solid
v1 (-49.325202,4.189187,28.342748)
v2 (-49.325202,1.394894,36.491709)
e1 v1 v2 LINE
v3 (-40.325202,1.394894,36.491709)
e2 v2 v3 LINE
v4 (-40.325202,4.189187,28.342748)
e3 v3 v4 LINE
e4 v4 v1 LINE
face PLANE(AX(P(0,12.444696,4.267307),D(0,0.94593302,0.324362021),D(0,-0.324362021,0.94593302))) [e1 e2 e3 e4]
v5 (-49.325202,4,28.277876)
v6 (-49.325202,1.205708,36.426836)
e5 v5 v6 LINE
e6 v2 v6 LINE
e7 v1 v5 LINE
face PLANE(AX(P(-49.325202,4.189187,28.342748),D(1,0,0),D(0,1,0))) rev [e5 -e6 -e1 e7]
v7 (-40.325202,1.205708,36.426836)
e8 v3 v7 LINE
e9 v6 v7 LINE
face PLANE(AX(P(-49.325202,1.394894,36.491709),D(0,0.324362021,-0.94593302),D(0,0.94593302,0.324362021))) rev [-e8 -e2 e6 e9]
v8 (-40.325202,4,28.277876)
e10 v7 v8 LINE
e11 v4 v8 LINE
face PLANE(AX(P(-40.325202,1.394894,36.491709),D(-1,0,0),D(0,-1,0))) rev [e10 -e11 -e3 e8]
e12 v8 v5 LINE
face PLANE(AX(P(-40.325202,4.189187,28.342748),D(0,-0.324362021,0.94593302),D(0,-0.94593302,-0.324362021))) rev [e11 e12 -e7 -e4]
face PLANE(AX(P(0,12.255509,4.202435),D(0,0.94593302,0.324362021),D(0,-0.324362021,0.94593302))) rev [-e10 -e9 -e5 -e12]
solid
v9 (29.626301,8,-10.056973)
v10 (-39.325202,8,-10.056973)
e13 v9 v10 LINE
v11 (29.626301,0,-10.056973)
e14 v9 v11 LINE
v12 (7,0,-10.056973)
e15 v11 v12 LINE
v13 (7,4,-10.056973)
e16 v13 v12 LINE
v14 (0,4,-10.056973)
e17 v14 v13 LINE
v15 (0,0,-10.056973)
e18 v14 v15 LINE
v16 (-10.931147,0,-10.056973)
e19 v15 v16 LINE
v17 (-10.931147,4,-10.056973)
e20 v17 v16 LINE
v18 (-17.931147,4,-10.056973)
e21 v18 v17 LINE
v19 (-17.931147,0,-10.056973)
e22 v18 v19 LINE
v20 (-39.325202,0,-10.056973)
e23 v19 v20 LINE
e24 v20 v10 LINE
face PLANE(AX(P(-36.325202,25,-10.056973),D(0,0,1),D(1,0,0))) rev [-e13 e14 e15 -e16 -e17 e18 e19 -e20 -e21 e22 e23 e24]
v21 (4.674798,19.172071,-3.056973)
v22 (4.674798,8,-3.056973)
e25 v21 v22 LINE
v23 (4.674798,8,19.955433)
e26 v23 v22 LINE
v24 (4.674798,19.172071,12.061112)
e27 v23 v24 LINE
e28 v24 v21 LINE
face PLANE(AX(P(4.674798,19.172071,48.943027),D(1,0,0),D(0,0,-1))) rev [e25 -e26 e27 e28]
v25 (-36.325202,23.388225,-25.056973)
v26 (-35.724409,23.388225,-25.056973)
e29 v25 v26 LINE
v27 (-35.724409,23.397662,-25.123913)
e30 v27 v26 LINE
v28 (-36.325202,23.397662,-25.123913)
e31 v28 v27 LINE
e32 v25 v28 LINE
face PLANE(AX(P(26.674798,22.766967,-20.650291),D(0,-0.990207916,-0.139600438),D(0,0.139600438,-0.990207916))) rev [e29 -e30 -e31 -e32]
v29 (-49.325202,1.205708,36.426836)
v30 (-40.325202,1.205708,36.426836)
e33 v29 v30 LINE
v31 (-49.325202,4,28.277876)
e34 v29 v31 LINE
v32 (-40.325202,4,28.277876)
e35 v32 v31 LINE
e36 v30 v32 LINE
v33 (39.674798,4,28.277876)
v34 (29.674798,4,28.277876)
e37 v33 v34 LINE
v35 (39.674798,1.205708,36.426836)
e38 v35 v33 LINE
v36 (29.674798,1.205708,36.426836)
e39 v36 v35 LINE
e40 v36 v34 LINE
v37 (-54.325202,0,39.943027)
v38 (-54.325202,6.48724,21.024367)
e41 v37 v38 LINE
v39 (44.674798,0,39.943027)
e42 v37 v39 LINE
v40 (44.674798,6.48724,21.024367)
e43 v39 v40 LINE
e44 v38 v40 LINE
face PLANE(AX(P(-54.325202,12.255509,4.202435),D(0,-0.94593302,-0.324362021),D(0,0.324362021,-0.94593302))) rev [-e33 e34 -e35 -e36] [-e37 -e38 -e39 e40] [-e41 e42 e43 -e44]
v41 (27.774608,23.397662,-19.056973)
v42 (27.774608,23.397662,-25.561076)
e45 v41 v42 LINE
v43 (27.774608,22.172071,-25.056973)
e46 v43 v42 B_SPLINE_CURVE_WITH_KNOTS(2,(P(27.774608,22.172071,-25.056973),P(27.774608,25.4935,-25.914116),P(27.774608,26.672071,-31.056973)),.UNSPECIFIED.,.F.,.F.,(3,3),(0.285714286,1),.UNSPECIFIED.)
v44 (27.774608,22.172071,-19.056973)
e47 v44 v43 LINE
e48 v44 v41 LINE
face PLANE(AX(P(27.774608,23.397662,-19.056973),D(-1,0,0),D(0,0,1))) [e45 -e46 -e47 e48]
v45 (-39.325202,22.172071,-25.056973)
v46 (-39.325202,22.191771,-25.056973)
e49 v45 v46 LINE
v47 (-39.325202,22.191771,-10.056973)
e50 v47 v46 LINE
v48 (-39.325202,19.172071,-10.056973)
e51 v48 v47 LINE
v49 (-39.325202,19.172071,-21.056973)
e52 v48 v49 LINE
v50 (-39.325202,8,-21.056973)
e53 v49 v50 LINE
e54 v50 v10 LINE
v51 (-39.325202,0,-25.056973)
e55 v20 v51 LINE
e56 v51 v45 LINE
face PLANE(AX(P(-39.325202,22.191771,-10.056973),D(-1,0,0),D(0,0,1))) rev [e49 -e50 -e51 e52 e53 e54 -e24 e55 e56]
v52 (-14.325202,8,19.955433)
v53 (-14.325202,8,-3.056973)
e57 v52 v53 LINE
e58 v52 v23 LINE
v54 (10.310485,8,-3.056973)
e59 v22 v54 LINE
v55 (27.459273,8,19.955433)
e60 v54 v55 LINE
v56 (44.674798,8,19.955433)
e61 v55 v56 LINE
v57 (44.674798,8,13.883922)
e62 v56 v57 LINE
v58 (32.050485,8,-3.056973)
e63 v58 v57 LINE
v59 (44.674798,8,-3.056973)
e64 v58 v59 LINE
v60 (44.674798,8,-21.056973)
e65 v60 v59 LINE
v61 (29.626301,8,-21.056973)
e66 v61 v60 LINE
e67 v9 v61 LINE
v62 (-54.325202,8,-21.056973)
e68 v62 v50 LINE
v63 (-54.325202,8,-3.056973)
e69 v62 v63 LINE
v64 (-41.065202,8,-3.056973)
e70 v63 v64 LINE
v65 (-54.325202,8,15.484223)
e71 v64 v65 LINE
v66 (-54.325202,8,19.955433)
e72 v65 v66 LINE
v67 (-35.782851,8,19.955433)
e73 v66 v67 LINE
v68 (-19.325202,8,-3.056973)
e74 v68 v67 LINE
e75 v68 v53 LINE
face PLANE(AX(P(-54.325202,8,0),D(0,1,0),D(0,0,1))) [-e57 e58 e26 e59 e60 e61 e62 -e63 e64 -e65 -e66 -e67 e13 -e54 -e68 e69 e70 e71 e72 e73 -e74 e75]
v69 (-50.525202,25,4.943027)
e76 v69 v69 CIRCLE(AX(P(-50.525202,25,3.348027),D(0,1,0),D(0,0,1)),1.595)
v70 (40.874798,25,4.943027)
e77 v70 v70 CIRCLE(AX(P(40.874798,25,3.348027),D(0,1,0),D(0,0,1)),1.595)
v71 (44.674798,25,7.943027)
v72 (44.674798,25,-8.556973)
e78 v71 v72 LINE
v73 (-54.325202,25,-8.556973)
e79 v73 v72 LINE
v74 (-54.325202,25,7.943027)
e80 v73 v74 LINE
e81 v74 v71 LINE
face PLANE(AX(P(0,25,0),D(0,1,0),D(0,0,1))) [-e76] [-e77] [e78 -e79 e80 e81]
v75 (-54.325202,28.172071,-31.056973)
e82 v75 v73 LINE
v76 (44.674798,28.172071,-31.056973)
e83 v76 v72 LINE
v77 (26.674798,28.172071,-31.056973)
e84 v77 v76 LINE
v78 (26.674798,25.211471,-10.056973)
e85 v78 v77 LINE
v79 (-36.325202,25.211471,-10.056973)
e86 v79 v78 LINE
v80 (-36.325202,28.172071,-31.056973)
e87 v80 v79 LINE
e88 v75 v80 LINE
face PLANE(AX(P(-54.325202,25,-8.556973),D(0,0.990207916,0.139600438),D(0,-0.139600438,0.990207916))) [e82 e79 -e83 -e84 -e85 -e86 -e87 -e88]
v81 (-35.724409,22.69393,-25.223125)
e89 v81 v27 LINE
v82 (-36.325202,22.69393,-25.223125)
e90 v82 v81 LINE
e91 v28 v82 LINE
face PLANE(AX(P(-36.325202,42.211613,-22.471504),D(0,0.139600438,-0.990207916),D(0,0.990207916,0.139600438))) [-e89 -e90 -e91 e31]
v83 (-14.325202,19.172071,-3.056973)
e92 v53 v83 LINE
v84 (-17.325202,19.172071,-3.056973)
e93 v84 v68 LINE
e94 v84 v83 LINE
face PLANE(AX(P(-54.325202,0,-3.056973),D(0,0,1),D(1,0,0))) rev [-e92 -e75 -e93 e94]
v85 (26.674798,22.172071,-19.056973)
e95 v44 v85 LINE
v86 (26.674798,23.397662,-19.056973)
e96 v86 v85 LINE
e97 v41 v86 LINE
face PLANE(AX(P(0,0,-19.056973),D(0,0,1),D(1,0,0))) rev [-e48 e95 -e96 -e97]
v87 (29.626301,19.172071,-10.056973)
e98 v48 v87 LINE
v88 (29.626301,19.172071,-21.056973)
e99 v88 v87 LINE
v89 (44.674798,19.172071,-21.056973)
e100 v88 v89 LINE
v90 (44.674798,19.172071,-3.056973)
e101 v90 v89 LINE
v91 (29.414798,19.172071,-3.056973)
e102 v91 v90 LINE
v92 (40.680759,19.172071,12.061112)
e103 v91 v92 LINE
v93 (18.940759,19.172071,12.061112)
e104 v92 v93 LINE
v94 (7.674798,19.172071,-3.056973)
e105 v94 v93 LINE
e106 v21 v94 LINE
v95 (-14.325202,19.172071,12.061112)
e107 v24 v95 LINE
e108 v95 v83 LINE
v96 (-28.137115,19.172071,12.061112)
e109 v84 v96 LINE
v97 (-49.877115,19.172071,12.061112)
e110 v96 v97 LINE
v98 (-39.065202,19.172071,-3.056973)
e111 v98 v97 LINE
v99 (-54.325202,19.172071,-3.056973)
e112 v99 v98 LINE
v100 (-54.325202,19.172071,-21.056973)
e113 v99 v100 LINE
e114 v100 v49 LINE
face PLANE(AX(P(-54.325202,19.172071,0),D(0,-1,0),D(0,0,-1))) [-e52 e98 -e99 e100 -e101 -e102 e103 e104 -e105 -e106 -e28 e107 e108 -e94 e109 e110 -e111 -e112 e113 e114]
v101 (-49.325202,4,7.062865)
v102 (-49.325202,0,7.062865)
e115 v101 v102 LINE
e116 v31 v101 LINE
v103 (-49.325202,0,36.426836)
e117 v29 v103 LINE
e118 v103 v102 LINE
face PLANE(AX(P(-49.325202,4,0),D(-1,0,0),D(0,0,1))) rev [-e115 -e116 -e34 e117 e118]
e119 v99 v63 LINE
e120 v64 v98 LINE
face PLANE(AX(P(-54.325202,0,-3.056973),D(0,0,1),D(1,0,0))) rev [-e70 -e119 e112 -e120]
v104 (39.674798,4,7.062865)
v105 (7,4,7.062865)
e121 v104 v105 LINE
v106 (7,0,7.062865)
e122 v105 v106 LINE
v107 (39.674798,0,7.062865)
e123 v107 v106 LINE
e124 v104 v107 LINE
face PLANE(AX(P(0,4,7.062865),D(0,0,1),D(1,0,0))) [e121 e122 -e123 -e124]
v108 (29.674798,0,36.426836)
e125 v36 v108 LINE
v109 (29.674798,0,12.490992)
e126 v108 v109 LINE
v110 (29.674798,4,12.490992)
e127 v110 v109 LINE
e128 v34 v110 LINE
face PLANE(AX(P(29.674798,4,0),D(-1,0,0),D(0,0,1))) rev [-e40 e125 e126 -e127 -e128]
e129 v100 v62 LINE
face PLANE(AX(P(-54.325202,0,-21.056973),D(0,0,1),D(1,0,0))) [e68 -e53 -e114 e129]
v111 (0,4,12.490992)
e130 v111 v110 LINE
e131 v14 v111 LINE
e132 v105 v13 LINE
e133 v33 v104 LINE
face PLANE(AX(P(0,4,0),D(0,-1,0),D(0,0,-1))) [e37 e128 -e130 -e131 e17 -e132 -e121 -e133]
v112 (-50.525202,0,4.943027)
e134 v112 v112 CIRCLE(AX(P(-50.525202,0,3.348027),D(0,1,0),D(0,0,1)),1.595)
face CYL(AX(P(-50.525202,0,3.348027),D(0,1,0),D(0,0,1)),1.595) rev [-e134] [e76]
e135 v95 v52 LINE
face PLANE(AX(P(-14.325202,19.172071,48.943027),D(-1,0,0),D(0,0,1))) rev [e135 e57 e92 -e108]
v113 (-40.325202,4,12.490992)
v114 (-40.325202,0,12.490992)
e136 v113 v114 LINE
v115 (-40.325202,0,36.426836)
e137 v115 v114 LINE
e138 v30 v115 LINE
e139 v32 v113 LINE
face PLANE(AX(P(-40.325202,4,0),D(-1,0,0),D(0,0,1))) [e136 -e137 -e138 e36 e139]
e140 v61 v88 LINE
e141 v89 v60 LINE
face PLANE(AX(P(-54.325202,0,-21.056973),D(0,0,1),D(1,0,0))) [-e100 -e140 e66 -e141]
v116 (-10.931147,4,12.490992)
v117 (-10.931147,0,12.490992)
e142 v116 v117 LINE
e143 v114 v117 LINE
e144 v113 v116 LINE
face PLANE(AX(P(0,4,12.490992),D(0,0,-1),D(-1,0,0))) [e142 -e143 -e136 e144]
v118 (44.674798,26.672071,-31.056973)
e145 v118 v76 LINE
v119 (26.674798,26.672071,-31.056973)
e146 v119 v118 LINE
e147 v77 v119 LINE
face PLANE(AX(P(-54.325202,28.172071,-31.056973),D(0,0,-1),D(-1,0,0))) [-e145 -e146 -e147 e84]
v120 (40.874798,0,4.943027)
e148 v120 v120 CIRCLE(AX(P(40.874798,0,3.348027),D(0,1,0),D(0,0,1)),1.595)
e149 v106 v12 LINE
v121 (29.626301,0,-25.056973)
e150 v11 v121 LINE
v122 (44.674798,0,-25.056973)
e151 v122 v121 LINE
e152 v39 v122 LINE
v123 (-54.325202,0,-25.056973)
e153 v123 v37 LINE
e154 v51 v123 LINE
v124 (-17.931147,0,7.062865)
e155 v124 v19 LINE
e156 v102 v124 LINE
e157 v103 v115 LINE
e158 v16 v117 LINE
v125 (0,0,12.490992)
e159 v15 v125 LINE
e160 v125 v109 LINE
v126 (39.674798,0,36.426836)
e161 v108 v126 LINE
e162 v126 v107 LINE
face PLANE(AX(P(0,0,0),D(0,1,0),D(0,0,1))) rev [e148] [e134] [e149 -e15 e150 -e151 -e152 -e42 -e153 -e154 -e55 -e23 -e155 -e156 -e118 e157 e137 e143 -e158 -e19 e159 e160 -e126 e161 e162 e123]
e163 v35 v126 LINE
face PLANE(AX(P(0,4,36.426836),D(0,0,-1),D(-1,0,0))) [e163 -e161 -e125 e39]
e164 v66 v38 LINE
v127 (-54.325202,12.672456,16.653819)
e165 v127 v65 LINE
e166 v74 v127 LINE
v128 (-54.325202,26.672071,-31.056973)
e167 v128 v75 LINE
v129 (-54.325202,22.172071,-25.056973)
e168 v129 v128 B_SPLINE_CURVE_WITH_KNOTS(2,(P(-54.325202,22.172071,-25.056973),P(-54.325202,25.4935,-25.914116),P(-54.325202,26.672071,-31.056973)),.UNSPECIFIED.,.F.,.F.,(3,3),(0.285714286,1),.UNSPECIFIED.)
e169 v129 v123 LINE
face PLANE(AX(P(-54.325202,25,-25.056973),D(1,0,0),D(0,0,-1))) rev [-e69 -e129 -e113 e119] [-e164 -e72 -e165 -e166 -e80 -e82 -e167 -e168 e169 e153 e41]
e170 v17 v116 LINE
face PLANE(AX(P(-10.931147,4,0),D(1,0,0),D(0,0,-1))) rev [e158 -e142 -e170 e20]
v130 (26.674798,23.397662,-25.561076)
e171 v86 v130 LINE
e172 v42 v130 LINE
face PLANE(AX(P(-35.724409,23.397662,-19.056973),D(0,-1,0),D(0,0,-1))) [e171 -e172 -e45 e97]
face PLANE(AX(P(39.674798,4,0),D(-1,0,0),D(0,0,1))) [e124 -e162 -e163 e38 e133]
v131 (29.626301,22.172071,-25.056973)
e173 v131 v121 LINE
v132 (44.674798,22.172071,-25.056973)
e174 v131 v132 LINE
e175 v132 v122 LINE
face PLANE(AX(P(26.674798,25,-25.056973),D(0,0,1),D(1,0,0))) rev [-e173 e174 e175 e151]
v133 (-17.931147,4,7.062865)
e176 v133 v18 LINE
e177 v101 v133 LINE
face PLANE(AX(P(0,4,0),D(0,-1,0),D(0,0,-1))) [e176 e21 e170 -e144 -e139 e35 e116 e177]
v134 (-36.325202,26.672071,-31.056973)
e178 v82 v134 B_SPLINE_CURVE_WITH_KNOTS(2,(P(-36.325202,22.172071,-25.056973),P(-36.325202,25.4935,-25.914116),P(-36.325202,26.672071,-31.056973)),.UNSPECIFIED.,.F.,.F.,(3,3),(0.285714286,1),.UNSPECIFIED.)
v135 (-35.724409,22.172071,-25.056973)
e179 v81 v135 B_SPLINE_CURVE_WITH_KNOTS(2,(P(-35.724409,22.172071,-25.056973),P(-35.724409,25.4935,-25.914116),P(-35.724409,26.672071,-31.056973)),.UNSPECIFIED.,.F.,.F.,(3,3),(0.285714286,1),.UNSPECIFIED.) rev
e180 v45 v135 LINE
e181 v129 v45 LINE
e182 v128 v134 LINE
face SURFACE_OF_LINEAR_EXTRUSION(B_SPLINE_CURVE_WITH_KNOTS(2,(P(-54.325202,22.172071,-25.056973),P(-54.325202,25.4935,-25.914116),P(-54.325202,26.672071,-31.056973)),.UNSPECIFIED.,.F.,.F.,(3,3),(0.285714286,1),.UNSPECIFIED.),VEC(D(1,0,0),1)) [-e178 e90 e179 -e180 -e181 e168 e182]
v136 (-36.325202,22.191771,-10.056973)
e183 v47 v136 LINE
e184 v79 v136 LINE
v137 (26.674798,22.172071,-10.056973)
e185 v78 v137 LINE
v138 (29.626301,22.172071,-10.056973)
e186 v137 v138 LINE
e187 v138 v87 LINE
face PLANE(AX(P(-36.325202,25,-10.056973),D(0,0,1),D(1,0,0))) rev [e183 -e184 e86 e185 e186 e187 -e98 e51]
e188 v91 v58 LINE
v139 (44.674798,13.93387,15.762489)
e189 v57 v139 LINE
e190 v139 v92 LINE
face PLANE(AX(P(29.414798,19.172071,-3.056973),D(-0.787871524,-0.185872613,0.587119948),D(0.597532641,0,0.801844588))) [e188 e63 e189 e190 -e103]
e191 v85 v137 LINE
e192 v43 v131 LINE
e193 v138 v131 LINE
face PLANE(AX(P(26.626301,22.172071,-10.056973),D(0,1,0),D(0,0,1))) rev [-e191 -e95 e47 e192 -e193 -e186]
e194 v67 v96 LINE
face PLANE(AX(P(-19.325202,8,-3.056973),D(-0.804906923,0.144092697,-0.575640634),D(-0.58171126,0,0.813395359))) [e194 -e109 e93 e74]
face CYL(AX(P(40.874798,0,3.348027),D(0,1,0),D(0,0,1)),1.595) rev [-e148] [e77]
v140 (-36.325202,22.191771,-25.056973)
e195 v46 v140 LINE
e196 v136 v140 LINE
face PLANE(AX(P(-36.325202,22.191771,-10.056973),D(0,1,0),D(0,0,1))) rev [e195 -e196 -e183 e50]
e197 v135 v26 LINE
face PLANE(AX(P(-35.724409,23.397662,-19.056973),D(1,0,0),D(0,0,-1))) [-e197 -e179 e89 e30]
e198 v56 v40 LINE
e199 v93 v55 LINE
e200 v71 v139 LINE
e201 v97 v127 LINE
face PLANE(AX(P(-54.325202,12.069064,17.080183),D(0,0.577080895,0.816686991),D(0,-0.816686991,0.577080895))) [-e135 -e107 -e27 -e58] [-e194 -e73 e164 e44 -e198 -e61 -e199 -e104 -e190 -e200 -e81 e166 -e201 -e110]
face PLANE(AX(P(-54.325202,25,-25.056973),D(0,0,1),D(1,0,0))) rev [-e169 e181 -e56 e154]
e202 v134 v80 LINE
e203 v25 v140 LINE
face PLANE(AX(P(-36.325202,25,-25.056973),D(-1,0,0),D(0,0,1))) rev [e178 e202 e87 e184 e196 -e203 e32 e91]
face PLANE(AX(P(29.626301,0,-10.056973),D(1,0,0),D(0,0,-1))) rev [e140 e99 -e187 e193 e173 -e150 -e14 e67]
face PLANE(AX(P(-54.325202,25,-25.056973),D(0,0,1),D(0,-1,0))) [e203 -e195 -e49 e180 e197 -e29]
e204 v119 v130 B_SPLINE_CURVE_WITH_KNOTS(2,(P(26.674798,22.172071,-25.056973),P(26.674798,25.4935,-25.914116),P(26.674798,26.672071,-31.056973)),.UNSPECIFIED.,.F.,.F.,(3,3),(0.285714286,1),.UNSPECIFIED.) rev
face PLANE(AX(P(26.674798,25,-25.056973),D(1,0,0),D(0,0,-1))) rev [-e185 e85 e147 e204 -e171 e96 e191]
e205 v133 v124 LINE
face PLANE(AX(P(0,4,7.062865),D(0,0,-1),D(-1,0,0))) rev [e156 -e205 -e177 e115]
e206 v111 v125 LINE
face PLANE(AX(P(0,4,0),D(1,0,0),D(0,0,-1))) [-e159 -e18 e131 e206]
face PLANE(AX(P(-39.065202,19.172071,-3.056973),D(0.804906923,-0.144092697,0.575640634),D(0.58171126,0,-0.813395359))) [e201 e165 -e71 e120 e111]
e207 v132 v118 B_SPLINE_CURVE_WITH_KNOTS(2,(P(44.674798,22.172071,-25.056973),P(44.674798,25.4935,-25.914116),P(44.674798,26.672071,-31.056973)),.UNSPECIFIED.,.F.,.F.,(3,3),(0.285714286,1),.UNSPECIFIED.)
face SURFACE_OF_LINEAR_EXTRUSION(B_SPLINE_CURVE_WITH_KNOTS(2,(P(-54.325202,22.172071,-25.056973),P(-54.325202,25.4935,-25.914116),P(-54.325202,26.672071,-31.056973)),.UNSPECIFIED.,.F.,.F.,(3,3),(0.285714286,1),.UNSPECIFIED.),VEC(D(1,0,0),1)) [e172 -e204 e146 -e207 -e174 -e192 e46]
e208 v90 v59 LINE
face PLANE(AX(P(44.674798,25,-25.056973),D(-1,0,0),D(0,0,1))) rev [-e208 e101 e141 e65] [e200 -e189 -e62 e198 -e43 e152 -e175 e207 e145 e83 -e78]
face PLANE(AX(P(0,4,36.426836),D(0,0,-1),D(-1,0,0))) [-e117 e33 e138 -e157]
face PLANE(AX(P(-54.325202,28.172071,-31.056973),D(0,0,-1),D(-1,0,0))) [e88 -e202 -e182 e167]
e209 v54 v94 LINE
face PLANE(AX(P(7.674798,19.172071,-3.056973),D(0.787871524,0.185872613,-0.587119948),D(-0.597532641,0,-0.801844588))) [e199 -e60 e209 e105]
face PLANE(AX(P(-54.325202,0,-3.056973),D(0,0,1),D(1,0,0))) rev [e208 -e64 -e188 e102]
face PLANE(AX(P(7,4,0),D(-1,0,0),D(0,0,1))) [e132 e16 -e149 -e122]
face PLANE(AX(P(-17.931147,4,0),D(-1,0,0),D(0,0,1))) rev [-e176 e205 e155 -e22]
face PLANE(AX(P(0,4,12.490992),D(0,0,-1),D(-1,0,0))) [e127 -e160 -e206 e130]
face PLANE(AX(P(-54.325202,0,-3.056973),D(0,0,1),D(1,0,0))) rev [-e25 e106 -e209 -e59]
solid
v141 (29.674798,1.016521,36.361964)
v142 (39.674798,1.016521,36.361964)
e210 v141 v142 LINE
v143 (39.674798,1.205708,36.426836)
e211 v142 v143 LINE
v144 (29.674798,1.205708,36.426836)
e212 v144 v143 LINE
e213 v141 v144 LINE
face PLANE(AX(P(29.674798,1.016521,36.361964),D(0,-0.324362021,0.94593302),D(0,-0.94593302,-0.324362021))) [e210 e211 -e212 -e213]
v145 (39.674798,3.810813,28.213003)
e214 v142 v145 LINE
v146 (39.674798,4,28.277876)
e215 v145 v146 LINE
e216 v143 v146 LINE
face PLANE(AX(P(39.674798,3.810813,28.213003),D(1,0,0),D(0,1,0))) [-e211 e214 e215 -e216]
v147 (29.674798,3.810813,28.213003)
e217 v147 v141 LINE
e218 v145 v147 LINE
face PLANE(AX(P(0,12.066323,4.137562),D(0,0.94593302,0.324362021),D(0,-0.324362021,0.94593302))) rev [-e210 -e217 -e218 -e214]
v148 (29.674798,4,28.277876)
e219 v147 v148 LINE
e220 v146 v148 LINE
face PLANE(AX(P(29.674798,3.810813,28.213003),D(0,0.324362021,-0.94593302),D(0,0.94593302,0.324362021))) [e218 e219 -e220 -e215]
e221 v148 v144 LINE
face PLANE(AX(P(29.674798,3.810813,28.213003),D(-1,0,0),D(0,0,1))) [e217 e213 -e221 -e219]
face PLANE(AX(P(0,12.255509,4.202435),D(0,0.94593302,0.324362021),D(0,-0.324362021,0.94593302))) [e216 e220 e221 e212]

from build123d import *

# Parameters (mm, degrees)
BOSS_EXTRUDE2_DEPTH      = 25
SKETCH4_W                = 18
SKETCH4_H                = 11.172071032
CUT_EXTRUDE1_DEPTH       = 110.64235231
BOSS_EXTRUDE3_DEPTH      = 99
SKETCH6_W                = 63
SKETCH6_H                = 15
CUT_EXTRUDE2_DEPTH       = 99
SKETCH7_R                = 1.595
CUT_EXTRUDE3_DEPTH       = 72.914344682
CUT_EXTRUDE6_DEPTH       = 52
CUT_SWEEP3_START         = -47.833237702
CUT_SWEEP3_DEPTH         = 41.493253901
CUT_SWEEP4_START         = 1.791784621
CUT_SWEEP4_DEPTH         = 40.904021271
SKETCH18_W               = 63
SKETCH18_H               = 6.0593335
CUT_EXTRUDE8_DEPTH       = 70.563104286
CUT_EXTRUDE11_DEPTH      = 39
CUT_EXTRUDE11_DEPTH_BACK = 5
SKETCH19_W               = 63
SKETCH19_H               = 3.899399546
CUT_EXTRUDE12_DEPTH      = 6
CUT_EXTRUDE12_DEPTH_BACK = 39
SKETCH21_W               = 63.499017214
SKETCH21_H               = 3.594283993
CUT_EXTRUDE13_DEPTH      = 19
CUT_EXTRUDE13_DEPTH_BACK = 39
SKETCH22_W               = 63
SKETCH22_H               = 0.482139274
SKETCH23_W               = 3
SKETCH23_H               = 22.172071032
CUT_EXTRUDE14_DEPTH      = 15
SKETCH24_W               = 3
SKETCH24_H               = 22.191771217
CUT_EXTRUDE15_DEPTH      = 15
CUT_EXTRUDE16_DEPTH      = 4
SKETCH27_W               = 10
SKETCH27_H               = 8.614733054
BOSS_EXTRUDE5_DEPTH      = 0.2
SKETCH28_W               = 9
SKETCH28_H               = 8.614733054
BOSS_EXTRUDE6_DEPTH      = 0.2


with BuildPart() as part:
    # Sketch1 → Boss-Extrude2 (new body)
    with BuildSketch(Plane(origin=(0, 0, 0), x_dir=(1, 0, 0), z_dir=(0, 1, 0))):
        Polygon((26.674798416, 25.056972824), (44.674798416, 25.056972824), (44.674798416, -39.943027176), (-54.325201584, -39.943027176), (-54.325201584, 25.056972824), (-36.325201584, 25.056972824), (-36.325201584, 10.056972824), (26.674798416, 10.056972824), align=None)
    extrude(amount=BOSS_EXTRUDE2_DEPTH)

    # Sketch4 → Cut-Extrude1 (cut, through all)
    with BuildSketch(Plane(origin=(44.674798416, 0, 0), x_dir=(0, 0, -1), z_dir=(1, 0, 0))):
        Polygon((-39.943027176, 25), (-39.943027176, 0), (-21.024366767, 6.487240423), (-7.943027176, 25), align=None)
        with Locations((12.056972824, 13.586035516)):
            Rectangle(SKETCH4_W, SKETCH4_H)
    extrude(amount=-CUT_EXTRUDE1_DEPTH, mode=Mode.SUBTRACT)

    # Sketch5 → Boss-Extrude3 (add)
    with BuildSketch(Plane(origin=(44.674798416, 0, 0), x_dir=(0, 0, -1), z_dir=(1, 0, 0))):
        with BuildLine():
            Line((8.556972824, 25), (31.056972824, 28.172071032))
            Line((31.056972824, 28.172071032), (31.056972824, 26.672071032))
            add(Edge.make_bspline(
                [(25.056972824, 22.172071032), (25.914115681, 25.493499604), (31.056972824, 26.672071032)],
                knots=[0.285714286, 0.285714286, 0.285714286, 1, 1, 1], degree=2))
            Line((25.056972824, 22.172071032), (25.056972824, 25))
            Line((25.056972824, 25), (8.556972824, 25))
        make_face()
    extrude(amount=-BOSS_EXTRUDE3_DEPTH)

    # Sketch6 → Cut-Extrude2 (cut)
    with BuildSketch(Plane.XZ.offset(-25)):
        with Locations((-4.825201584, -17.556972824)):
            Rectangle(SKETCH6_W, SKETCH6_H)
    extrude(amount=-CUT_EXTRUDE2_DEPTH, mode=Mode.SUBTRACT)

    # Sketch7 → Cut-Extrude3 (cut, through all)
    with BuildSketch(Plane(origin=(0, 25, 0), x_dir=(1, 0, 0), z_dir=(0, 1, 0))):
        with Locations(Location((40.874798416, -3.348027176, 0), (0, 0, 270))):
            Circle(SKETCH7_R)
        with Locations(Location((-50.525201584, -3.348027176, 0), (0, 0, 270))):
            Circle(SKETCH7_R)
    extrude(amount=-CUT_EXTRUDE3_DEPTH, mode=Mode.SUBTRACT)

    # Sketch9 → Cut-Extrude6 (cut)
    with BuildSketch(Plane(origin=(0, 0, -3.056972824), x_dir=(-1, 0, 0), z_dir=(0, 0, -1))):
        Polygon((4.825201584, 19.172071032), (14.325201584, 19.172071032), (14.325201584, 8), (4.825201584, 8), (-4.674798416, 8), (-4.674798416, 19.172071032), align=None)
    extrude(amount=-CUT_EXTRUDE6_DEPTH, mode=Mode.SUBTRACT)

    # Cut-Sweep3: read off the stored shape, not the designer's step
    # Cut-Sweep3 outline → Cut-Sweep3 (cut)
    with BuildSketch(Plane(origin=(0, 0, 0), x_dir=(0.8133953590059209, 0, 0.5817112599457132), z_dir=(0.5817112599457132, 0, -0.8133953590059209)).offset(CUT_SWEEP3_START)):
        Polygon((-17.497304793, -8), (-35.180519898, -8), (-33.55372918, -19.172071032), (-15.870514075, -19.172071032), align=None)
    extrude(amount=CUT_SWEEP3_DEPTH, mode=Mode.SUBTRACT)

    # Cut-Sweep4: read off the stored shape, not the designer's step
    # Cut-Sweep4 outline → Cut-Sweep4 (cut)
    with BuildSketch(Plane(origin=(0, 0, 0), x_dir=(0.8018445876826973, 0, -0.5975326411201026), z_dir=(0.5975326411201026, 0, 0.8018445876826972)).offset(CUT_SWEEP4_START)):
        Polygon((10.094047266, 8), (27.526148602, 8), (25.412737953, 19.172071032), (7.980636617, 19.172071032), align=None)
    extrude(amount=CUT_SWEEP4_DEPTH, mode=Mode.SUBTRACT)

    # Sketch18 → Cut-Extrude8 (cut, through all)
    with BuildSketch(Plane(origin=(0, 23.329932997, 3.289075762), x_dir=(1, 0, 0), z_dir=(0, 0.9902079164509707, 0.1396004376706153))):
        with Locations((-4.825201584, 31.656027047)):
            Rectangle(SKETCH18_W, SKETCH18_H)
    extrude(amount=-CUT_EXTRUDE8_DEPTH, mode=Mode.SUBTRACT)

    # Sketch19 → Cut-Extrude11 (cut, two sides: drawn at the far end of the back side and taken through both)
    with BuildSketch(Plane(origin=(0, 3.996252426, -28.346048585), x_dir=(-1, 0, 0), z_dir=(0, 0.13960043767061533, -0.9902079164509707)).offset(-CUT_EXTRUDE11_DEPTH_BACK)):
        with Locations((4.825201584, 21.610940987)):
            Rectangle(SKETCH19_W, SKETCH19_H)
    extrude(amount=CUT_EXTRUDE11_DEPTH + CUT_EXTRUDE11_DEPTH_BACK, mode=Mode.SUBTRACT)

    # Sketch21 → Cut-Extrude12 (cut, two sides: drawn at the far end of the back side and taken through both)
    with BuildSketch(Plane.XY.offset(-25.056972824).offset(-CUT_EXTRUDE12_DEPTH_BACK)):
        with Locations((-3.974900461, 21.600520274)):
            Rectangle(SKETCH21_W, SKETCH21_H)
    extrude(amount=CUT_EXTRUDE12_DEPTH + CUT_EXTRUDE12_DEPTH_BACK, mode=Mode.SUBTRACT)

    # Sketch22 → Cut-Extrude13 (cut, two sides: drawn at the far end of the back side and taken through both)
    with BuildSketch(Plane(origin=(0, 19.468716697, 2.744717879), x_dir=(1, 0, 0), z_dir=(0, 0.9902079164509707, 0.13960043767061536)).offset(-CUT_EXTRUDE13_DEPTH_BACK)):
        with Locations((-4.825201584, 28.38529066)):
            Rectangle(SKETCH22_W, SKETCH22_H)
    extrude(amount=CUT_EXTRUDE13_DEPTH + CUT_EXTRUDE13_DEPTH_BACK, mode=Mode.SUBTRACT)

    # Sketch23 → Cut-Extrude14 (cut)
    with BuildSketch(Plane(origin=(0, 0, -25.056972824), x_dir=(-1, 0, 0), z_dir=(0, 0, -1))):
        with Locations((-28.126300659, 11.086035516)):
            Rectangle(SKETCH23_W, SKETCH23_H)
    extrude(amount=-CUT_EXTRUDE14_DEPTH, mode=Mode.SUBTRACT)

    # Sketch24 → Cut-Extrude15 (cut)
    with BuildSketch(Plane(origin=(0, 0, -25.056972824), x_dir=(-1, 0, 0), z_dir=(0, 0, -1))):
        with Locations((37.825201584, 11.095885609)):
            Rectangle(SKETCH24_W, SKETCH24_H)
    extrude(amount=-CUT_EXTRUDE15_DEPTH, mode=Mode.SUBTRACT)

    # Sketch25 → Cut-Extrude16 (cut)
    with BuildSketch(Plane.XZ):
        Polygon((-40.325201584, 36.426836245), (-49.325201584, 36.426836245), (-49.325201584, 30.426836245), (-49.325201584, 7.062865475), (-17.931146708, 7.062865475), (-17.931146708, -10.056972824), (-10.931146708, -10.056972824), (-10.931146708, 12.49099165), (-40.325201584, 12.49099165), (-40.325201584, 30.426836245), align=None)
        Polygon((0, 12.49099165), (0, -10.056972824), (7, -10.056972824), (7, 7.062865475), (39.674798416, 7.062865475), (39.674798416, 30.426836245), (39.674798416, 36.426836245), (29.674798416, 36.426836245), (29.674798416, 30.426836245), (29.674798416, 12.49099165), align=None)
    extrude(amount=-CUT_EXTRUDE16_DEPTH, mode=Mode.SUBTRACT)


with BuildPart() as body_2:
    # Sketch27 → Boss-Extrude5 (new body)
    with BuildSketch(Plane(origin=(0, 12.255509184, 4.202434679), x_dir=(1, 0, 0), z_dir=(0, 0.9459330204787307, 0.32436202115535245))):
        with Locations((34.674798416, -29.758894898)):
            Rectangle(SKETCH27_W, SKETCH27_H)
    extrude(amount=-BOSS_EXTRUDE5_DEPTH)


with BuildPart() as body_3:
    # Sketch28 → Boss-Extrude6 (new body)
    with BuildSketch(Plane(origin=(0, 12.255509184, 4.202434679), x_dir=(1, 0, 0), z_dir=(0, 0.9459330204787307, 0.32436202115535245))):
        with Locations((-44.825201584, -29.758894898)):
            Rectangle(SKETCH28_W, SKETCH28_H)
    extrude(amount=BOSS_EXTRUDE6_DEPTH)


solid = Compound([part.part, body_2.part, body_3.part])
